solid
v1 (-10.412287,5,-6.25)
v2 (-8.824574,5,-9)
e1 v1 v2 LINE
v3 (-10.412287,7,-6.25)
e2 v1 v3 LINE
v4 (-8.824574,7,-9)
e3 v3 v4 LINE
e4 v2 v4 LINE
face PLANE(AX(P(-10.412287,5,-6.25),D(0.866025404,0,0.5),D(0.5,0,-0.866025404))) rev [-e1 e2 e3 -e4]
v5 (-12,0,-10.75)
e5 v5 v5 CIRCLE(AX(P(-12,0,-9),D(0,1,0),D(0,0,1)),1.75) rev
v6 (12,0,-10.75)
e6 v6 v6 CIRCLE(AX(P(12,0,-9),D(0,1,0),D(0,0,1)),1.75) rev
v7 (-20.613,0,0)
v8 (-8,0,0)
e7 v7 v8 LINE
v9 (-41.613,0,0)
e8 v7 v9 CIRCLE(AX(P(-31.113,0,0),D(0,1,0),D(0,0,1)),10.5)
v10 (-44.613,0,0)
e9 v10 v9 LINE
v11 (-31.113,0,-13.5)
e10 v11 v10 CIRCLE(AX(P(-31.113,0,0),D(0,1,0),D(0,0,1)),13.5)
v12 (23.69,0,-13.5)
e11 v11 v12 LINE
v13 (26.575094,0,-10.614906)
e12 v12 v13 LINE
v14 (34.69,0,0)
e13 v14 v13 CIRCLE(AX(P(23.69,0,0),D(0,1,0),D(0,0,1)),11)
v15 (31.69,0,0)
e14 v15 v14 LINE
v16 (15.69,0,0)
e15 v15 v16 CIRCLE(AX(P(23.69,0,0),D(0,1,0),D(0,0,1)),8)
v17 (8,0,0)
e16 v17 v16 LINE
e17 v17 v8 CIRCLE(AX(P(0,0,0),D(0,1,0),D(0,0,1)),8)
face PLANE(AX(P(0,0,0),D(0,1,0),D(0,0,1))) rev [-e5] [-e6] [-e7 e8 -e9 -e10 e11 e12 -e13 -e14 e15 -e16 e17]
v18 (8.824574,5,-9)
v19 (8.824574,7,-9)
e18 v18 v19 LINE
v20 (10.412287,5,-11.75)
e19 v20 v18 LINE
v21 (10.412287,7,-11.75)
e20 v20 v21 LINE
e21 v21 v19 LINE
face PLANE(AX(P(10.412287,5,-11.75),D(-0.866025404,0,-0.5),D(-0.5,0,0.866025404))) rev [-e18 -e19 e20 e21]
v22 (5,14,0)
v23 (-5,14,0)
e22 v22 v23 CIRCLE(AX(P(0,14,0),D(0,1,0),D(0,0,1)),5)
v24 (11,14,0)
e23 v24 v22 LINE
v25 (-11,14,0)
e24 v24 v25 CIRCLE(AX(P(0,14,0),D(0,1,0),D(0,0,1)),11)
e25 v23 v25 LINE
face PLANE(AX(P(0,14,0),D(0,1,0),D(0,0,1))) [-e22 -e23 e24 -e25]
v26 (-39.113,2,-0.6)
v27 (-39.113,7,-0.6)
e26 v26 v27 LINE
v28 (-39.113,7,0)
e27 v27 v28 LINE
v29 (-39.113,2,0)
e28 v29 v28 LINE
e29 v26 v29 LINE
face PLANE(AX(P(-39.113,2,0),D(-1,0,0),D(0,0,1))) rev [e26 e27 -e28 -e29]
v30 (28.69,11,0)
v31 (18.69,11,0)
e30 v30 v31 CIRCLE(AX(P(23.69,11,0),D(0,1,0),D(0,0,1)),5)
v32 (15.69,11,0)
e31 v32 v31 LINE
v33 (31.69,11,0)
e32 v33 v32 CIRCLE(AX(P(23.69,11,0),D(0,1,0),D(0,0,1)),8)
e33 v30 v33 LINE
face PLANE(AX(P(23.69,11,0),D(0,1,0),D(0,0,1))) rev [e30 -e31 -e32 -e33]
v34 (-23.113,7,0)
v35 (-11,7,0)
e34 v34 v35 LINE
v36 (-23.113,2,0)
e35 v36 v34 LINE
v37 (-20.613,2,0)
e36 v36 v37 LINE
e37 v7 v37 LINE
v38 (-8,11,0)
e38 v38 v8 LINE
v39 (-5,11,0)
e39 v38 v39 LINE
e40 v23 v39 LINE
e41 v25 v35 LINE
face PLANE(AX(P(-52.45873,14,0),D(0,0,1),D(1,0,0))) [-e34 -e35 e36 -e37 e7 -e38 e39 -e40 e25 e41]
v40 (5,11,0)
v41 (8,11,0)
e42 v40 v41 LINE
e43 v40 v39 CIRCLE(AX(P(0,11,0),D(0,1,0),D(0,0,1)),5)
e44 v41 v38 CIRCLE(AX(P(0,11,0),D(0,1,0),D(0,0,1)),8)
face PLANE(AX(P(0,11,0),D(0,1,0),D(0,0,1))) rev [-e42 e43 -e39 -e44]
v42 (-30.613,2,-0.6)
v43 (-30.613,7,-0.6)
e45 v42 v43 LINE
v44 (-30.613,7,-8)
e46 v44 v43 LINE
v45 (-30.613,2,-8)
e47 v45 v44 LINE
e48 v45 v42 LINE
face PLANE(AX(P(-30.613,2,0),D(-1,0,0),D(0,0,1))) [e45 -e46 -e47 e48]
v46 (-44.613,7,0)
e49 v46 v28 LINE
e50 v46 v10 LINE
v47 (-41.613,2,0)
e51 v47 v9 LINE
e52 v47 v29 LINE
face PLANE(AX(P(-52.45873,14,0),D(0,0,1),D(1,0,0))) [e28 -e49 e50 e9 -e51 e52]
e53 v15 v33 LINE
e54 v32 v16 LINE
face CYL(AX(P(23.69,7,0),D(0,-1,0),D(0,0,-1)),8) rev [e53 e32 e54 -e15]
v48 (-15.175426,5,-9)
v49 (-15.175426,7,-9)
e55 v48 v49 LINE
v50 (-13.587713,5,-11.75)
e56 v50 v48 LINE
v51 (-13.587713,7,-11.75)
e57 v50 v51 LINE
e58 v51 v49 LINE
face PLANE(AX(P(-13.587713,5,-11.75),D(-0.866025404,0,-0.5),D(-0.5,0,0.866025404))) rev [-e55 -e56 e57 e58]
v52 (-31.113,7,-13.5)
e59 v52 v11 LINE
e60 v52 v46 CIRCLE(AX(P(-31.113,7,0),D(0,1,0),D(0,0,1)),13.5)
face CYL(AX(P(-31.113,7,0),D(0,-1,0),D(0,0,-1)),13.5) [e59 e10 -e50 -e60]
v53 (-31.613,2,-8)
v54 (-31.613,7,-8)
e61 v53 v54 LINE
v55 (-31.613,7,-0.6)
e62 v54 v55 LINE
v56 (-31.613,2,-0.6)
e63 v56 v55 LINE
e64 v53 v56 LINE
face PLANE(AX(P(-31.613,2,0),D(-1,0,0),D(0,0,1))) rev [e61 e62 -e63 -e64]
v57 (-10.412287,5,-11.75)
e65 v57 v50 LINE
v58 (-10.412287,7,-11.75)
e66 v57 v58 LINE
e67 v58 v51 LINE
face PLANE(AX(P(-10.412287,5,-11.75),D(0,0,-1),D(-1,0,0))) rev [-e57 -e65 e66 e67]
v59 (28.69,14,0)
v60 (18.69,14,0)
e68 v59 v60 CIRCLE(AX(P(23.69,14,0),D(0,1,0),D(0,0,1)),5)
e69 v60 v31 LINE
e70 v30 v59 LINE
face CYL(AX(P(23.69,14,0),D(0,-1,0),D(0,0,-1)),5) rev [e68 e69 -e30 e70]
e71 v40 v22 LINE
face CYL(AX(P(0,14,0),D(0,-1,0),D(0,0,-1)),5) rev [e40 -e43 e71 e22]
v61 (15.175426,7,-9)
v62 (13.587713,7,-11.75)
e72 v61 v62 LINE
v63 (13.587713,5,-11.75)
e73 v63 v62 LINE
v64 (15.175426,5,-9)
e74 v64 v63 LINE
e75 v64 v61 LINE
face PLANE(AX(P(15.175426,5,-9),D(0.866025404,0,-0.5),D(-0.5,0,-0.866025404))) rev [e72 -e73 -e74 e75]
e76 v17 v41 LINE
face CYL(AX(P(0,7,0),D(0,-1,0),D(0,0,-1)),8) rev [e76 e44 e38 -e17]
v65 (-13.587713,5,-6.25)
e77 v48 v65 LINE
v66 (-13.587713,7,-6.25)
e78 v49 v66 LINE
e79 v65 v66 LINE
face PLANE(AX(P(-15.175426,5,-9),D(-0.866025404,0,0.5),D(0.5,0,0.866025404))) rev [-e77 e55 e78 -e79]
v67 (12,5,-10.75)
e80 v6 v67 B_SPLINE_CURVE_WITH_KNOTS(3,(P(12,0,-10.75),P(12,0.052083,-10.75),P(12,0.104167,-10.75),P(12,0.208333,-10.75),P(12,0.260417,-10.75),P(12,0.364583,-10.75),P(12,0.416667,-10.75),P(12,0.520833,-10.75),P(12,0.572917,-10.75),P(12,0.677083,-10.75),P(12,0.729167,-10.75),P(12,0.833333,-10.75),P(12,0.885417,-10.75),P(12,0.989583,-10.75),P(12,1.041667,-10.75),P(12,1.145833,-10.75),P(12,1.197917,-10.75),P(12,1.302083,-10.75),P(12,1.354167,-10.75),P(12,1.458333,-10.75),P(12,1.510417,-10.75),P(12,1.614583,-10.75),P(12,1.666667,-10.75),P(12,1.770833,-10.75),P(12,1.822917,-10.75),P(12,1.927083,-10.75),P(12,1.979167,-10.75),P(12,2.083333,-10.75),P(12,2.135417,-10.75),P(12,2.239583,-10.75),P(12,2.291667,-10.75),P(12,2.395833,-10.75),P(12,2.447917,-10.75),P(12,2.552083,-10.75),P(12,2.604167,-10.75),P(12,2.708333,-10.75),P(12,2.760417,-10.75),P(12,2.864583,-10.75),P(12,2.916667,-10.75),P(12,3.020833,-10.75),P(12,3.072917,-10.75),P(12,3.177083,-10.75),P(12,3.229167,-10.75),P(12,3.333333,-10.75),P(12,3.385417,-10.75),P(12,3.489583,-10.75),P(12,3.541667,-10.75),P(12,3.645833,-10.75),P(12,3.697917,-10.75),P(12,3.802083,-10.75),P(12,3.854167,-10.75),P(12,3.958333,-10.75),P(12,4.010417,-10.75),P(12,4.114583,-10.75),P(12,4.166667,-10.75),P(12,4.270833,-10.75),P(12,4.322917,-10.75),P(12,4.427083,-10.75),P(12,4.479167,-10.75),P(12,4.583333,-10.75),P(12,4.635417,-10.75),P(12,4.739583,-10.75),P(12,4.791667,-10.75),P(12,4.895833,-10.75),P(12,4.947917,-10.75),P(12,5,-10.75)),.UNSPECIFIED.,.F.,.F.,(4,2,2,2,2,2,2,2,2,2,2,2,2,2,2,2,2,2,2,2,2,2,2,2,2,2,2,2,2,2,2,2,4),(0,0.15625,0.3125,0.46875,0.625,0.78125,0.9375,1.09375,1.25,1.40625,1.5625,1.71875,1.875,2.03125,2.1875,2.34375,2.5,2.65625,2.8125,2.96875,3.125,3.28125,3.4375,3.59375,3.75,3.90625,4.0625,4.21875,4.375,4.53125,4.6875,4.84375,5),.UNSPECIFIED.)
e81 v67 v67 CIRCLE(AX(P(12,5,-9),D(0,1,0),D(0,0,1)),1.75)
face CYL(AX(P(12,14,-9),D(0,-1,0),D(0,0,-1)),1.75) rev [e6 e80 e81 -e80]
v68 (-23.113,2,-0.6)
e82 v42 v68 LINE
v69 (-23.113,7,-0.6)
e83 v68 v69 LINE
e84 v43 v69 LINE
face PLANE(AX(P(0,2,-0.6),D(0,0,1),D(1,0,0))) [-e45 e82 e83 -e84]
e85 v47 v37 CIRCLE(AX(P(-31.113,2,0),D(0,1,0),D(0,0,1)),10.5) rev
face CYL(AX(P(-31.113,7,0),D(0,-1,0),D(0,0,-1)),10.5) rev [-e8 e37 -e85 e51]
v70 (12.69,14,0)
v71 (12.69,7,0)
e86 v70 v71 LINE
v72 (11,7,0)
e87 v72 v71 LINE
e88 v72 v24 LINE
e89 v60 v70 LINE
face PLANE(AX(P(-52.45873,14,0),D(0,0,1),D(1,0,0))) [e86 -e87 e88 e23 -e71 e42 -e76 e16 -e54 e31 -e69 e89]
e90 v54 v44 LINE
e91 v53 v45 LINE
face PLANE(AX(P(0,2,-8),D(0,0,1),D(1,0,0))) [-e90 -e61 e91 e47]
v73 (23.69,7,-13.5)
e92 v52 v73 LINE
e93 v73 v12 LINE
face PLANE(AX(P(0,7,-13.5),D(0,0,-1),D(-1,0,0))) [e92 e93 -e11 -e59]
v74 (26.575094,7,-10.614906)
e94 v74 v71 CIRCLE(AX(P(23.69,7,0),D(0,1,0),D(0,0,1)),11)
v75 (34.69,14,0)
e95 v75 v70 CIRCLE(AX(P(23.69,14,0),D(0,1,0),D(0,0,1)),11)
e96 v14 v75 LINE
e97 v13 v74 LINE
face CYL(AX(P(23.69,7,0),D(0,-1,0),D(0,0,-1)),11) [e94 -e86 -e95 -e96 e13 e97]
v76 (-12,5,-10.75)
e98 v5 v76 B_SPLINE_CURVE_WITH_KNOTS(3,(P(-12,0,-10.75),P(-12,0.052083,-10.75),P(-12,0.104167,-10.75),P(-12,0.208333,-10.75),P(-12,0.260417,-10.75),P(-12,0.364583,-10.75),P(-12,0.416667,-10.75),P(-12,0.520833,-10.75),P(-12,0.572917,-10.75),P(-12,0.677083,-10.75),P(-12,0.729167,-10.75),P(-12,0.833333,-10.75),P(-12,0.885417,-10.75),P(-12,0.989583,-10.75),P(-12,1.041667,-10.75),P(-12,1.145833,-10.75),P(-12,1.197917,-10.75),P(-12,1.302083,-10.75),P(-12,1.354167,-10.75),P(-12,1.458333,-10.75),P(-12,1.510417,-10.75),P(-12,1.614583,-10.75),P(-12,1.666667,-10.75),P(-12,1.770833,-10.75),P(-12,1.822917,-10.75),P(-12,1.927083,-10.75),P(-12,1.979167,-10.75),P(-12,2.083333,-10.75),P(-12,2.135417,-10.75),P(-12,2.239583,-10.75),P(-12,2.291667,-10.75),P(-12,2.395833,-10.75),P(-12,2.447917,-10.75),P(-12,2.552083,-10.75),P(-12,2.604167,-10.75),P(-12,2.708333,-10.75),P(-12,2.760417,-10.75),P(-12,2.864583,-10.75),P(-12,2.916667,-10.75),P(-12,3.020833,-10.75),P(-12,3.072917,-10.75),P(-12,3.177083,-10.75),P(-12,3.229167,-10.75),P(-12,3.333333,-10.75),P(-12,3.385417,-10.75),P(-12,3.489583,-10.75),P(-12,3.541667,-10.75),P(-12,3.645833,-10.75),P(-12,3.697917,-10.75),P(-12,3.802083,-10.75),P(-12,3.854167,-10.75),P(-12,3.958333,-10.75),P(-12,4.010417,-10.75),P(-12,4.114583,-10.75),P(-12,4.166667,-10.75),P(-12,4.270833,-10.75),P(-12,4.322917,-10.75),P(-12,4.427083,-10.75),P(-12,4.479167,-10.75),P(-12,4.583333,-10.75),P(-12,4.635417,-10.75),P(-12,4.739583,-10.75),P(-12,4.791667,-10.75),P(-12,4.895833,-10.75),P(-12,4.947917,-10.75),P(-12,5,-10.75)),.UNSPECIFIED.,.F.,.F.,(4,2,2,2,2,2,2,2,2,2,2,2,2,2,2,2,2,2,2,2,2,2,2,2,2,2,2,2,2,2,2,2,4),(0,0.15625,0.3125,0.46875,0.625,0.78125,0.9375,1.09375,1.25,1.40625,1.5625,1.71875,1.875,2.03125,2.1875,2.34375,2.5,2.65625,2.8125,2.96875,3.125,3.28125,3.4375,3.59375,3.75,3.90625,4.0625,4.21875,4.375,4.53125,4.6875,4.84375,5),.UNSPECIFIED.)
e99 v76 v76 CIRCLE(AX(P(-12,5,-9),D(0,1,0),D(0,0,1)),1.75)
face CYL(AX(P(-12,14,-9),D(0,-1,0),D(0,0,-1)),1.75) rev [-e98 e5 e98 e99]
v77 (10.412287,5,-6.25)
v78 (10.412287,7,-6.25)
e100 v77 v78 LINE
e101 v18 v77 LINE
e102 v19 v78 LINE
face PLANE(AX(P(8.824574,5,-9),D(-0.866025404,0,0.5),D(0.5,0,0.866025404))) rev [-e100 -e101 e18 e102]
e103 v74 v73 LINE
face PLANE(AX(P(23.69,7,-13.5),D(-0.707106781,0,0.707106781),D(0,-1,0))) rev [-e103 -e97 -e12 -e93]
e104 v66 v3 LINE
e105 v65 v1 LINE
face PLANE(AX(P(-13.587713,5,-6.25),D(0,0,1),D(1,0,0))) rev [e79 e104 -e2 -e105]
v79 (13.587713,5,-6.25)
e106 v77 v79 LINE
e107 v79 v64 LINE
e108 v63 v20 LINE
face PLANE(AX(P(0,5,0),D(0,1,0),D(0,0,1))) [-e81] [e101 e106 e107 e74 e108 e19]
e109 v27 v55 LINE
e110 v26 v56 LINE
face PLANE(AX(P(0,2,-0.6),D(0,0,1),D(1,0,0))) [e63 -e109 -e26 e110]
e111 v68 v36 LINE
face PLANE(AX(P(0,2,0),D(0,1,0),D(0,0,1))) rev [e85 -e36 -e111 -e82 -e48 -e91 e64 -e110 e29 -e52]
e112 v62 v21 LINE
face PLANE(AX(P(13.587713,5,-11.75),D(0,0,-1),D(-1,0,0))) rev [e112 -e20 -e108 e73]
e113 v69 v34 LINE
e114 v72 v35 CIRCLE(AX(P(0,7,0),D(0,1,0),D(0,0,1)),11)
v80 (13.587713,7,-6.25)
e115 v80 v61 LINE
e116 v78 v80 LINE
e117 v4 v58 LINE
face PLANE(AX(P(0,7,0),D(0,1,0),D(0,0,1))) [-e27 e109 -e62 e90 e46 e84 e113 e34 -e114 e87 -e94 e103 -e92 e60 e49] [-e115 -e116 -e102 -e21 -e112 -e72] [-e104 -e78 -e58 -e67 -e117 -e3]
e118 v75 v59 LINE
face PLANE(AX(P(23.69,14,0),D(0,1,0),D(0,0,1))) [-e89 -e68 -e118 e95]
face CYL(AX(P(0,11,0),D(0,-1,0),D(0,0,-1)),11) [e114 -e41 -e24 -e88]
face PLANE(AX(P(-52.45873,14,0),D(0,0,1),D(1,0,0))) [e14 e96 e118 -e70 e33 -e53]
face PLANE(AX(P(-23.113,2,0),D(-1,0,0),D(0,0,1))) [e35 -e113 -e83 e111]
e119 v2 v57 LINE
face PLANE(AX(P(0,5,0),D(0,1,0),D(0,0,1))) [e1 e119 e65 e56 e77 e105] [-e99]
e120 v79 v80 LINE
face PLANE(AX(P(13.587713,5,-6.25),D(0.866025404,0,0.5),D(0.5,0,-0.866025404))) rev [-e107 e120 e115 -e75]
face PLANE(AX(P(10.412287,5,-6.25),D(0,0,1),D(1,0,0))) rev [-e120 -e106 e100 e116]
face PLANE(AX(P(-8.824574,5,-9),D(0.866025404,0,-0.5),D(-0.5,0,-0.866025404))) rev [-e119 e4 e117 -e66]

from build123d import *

# Parameters (mm, degrees)
SKETCH3_R               = 8
SKETCH3_R_2             = 5.000000000000001
BOSS_EXTRUDE1_DEPTH     = 7
CUT_EXTRUDE3_DEPTH      = 65.10592616131524
CUT_EXTRUDE3_DEPTH_BACK = 65.10592616131524
SKETCH4_R               = 1.7500000000000004
SKETCH4_R_2             = 1.7500000000000013
SKETCH6_R               = 10.999999999999993
SKETCH6_R_2             = 7.999999999999998
SKETCH6_R_3             = 11
SKETCH6_R_4             = 8
BOSS_EXTRUDE2_DEPTH     = 4
SKETCH7_R               = 10.999999999999993
SKETCH7_R_2             = 5.000000000000001
SKETCH7_R_3             = 11
SKETCH7_R_4             = 5
BOSS_EXTRUDE3_DEPTH     = 3
CHAMFER1_SIZE           = 2.5
CUT_EXTRUDE5_DEPTH      = 66.242392422412
CUT_EXTRUDE5_DEPTH_BACK = 66.242392422412
SKETCH9_R               = 1.7499999999999998
CUT_EXTRUDE6_START      = -2
SKETCH10_R              = 1.7499999999999998
CUT_EXTRUDE6_DEPTH      = 2
CHAMFER3_SIZE2          = 32
CHAMFER3_SIZE           = 22
CHAMFER4_SIZE           = 16
FILLET1_DEPTH           = 7
BOSS_EXTRUDE6_START     = 2
BOSS_EXTRUDE6_OUTLINE_R = 10.5
BOSS_EXTRUDE6_DEPTH     = 5
CUT_EXTRUDE7_DEPTH      = 66.24239242241201
CUT_EXTRUDE7_DEPTH_BACK = 66.24239242241201
SKETCH16_W              = 114.08603317988053
SKETCH16_H              = 61.14789556835377


with BuildPart() as part:
    # Sketch3 → Boss-Extrude1 (new body)
    # profile 1 of 10: a face of its own
    with BuildSketch(Plane(origin=(0, 0, 0), x_dir=(1, 0, 0), z_dir=(0, 1, 0))):
        with BuildLine():
            ThreePointArc((-17.613, 0), (-21.567058453981605, 9.545941546018392), (-31.113, 13.500000000000002))
            Line((-31.113, 13.5), (-31.113, 10.499999999999996))
            ThreePointArc((-31.11300000000032, 10.499999999999996), (-23.688378797541365, 7.424621202458859), (-20.613000000000003, 0))
            ThreePointArc((-20.613000000000003, -2.57e-15), (-23.688378797541368, -7.4246212024588605), (-31.11300000000031, -10.499999999999996))
            Line((-31.112999999999992, -10.499999999999996), (-31.112999999999992, -13.500000000000007))
            ThreePointArc((-31.11299999999999, -13.500000000000002), (-21.567058453981602, -9.545941546018385), (-17.613, -3.31e-15))
        make_face()
    # profile 2 of 10: a face of its own
    with BuildSketch(Plane(origin=(0, 0, 0), x_dir=(1, 0, 0), z_dir=(0, 1, 0))):
        with BuildLine():
            Line((-31.113, 10.499999999999996), (-31.113, 13.5))
            ThreePointArc((-31.113, 13.500000000000002), (-44.613, -4.34e-15), (-31.11299999999999, -13.500000000000002))
            Line((-31.112999999999992, -13.500000000000007), (-31.112999999999992, -10.499999999999996))
            ThreePointArc((-31.11300000000031, -10.499999999999996), (-41.613, -8.04e-15), (-31.11300000000032, 10.499999999999996))
        make_face()
    # profile 3 of 10: a face of its own
    with BuildSketch(Plane(origin=(0, 0, 0), x_dir=(1, 0, 0), z_dir=(0, 1, 0))):
        with BuildLine():
            Line((23.690000000000005, 13.500000000000002), (-31.113, 13.5))
            ThreePointArc((-31.113, 13.500000000000002), (-21.567058453981605, 9.545941546018392), (-17.613, 0))
            ThreePointArc((-17.613, -3.31e-15), (-21.567058453981602, -9.545941546018385), (-31.11299999999999, -13.500000000000002))
            Line((-31.112999999999992, -13.500000000000005), (23.690000000000005, -13.499999999999998))
            Line((23.690000000000005, -13.499999999999998), (23.690000000000005, -10.999999999999991))
            ThreePointArc((23.689999999999998, -10.999999999999993), (12.690000000000008, 1.112e-14), (23.690000000000015, 10.999999999999993))
            Line((23.690000000000005, 10.999999999999993), (23.690000000000005, 13.500000000000002))
        make_face()
        with Locations(Location((0, 0, 0), (0, 0, 270))):
            Circle(SKETCH3_R, mode=Mode.SUBTRACT)
    # profile 4 of 10: a face of its own
    with BuildSketch(Plane(origin=(0, 0, 0), x_dir=(1, 0, 0), z_dir=(0, 1, 0))):
        with BuildLine():
            ThreePointArc((-17.613, 0), (-21.567058453981605, 9.545941546018392), (-31.113, 13.500000000000002))
            Line((-31.113, 13.5), (-31.113, 10.499999999999996))
            ThreePointArc((-31.11300000000032, 10.499999999999996), (-23.688378797541365, 7.424621202458859), (-20.613000000000003, 0))
            ThreePointArc((-20.613000000000003, -2.57e-15), (-23.688378797541368, -7.4246212024588605), (-31.11300000000031, -10.499999999999996))
            Line((-31.112999999999992, -10.499999999999996), (-31.112999999999992, -13.500000000000007))
            ThreePointArc((-31.11299999999999, -13.500000000000002), (-21.567058453981602, -9.545941546018385), (-17.613, -3.31e-15))
        make_face()
    # profile 5 of 10: a face of its own
    with BuildSketch(Plane(origin=(0, 0, 0), x_dir=(1, 0, 0), z_dir=(0, 1, 0))):
        with BuildLine():
            Line((-31.113, 10.499999999999996), (-31.113, 13.5))
            ThreePointArc((-31.113, 13.500000000000002), (-44.613, -4.34e-15), (-31.11299999999999, -13.500000000000002))
            Line((-31.112999999999992, -13.500000000000007), (-31.112999999999992, -10.499999999999996))
            ThreePointArc((-31.11300000000031, -10.499999999999996), (-41.613, -8.04e-15), (-31.11300000000032, 10.499999999999996))
        make_face()
    # profile 6 of 10: a face of its own
    with BuildSketch(Plane(origin=(0, 0, 0), x_dir=(1, 0, 0), z_dir=(0, 1, 0))):
        with BuildLine():
            ThreePointArc((34.69, 0), (31.468174593052026, 7.778174593052012), (23.690000000000015, 10.999999999999993))
            Line((23.690000000000005, 10.999999999999993), (23.690000000000005, 7.999999999999998))
            ThreePointArc((23.689999999999863, 7.999999999999998), (29.34685424949233, 5.6568542494924285), (31.689999999999998, 0))
            ThreePointArc((31.689999999999998, -1.96e-15), (29.34685424949233, -5.65685424949243), (23.68999999999986, -7.999999999999998))
            Line((23.690000000000005, -7.999999999999998), (23.690000000000005, -10.999999999999991))
            ThreePointArc((23.689999999999998, -10.999999999999993), (31.468174593052016, -7.77817459305202), (34.69, -2.69e-15))
        make_face()
    # profile 7 of 10: a face of its own
    with BuildSketch(Plane(origin=(0, 0, 0), x_dir=(1, 0, 0), z_dir=(0, 1, 0))):
        with BuildLine():
            Line((23.690000000000005, 7.999999999999998), (23.690000000000005, 10.999999999999993))
            ThreePointArc((23.690000000000015, 10.999999999999993), (12.690000000000008, 1.112e-14), (23.689999999999998, -10.999999999999993))
            Line((23.690000000000005, -10.999999999999991), (23.690000000000005, -7.999999999999998))
            ThreePointArc((23.68999999999986, -7.999999999999998), (15.690000000000003, 9.8e-16), (23.689999999999863, 7.999999999999998))
        make_face()
    # profile 8 of 10: a face of its own
    with BuildSketch(Plane(origin=(0, 0, 0), x_dir=(1, 0, 0), z_dir=(0, 1, 0))):
        Polygon((-31.112999999999992, -13.500000000000005), (23.690000000000005, -13.499999999999998), (23.690000000000005, -45.5), (-31.11299999999999, -45.5), align=None)
        with Locations(Location((0, -32.70757493091458, 0), (0, 0, 270))):
            Circle(SKETCH3_R_2, mode=Mode.SUBTRACT)
    # profile 9 of 10: a face of its own
    with BuildSketch(Plane(origin=(0, 0, 0), x_dir=(1, 0, 0), z_dir=(0, 1, 0))):
        with BuildLine():
            ThreePointArc((34.69, 0), (31.468174593052026, 7.778174593052012), (23.690000000000015, 10.999999999999993))
            Line((23.690000000000005, 10.999999999999993), (23.690000000000005, 7.999999999999998))
            ThreePointArc((23.689999999999863, 7.999999999999998), (29.34685424949233, 5.6568542494924285), (31.689999999999998, 0))
            ThreePointArc((31.689999999999998, -1.96e-15), (29.34685424949233, -5.65685424949243), (23.68999999999986, -7.999999999999998))
            Line((23.690000000000005, -7.999999999999998), (23.690000000000005, -10.999999999999991))
            ThreePointArc((23.689999999999998, -10.999999999999993), (31.468174593052016, -7.77817459305202), (34.69, -2.69e-15))
        make_face()
    # profile 10 of 10: a face of its own
    with BuildSketch(Plane(origin=(0, 0, 0), x_dir=(1, 0, 0), z_dir=(0, 1, 0))):
        with BuildLine():
            Line((23.690000000000005, 7.999999999999998), (23.690000000000005, 10.999999999999993))
            ThreePointArc((23.690000000000015, 10.999999999999993), (12.690000000000008, 1.112e-14), (23.689999999999998, -10.999999999999993))
            Line((23.690000000000005, -10.999999999999991), (23.690000000000005, -7.999999999999998))
            ThreePointArc((23.68999999999986, -7.999999999999998), (15.690000000000003, 9.8e-16), (23.689999999999863, 7.999999999999998))
        make_face()
    extrude(amount=BOSS_EXTRUDE1_DEPTH)

    # Sketch4 → Cut-Extrude3 (cut, two sides: drawn at the far end of the back side and taken through both)
    with BuildSketch(Plane(origin=(0, 0, 0), x_dir=(1, 0, 0), z_dir=(0, 1, 0)).offset(-CUT_EXTRUDE3_DEPTH_BACK)):
        with Locations(Location((5.5, -27.207574930914586, 0), (0, 0, 270))):
            Circle(SKETCH4_R)
        with Locations(Location((5.5, -38.20757493091458, 0), (0, 0, 270))):
            Circle(SKETCH4_R_2)
        with Locations(Location((-5.5, -38.20757493091458, 0), (0, 0, 270))):
            Circle(SKETCH4_R_2)
        with Locations(Location((-5.5, -27.207574930914586, 0), (0, 0, 270))):
            Circle(SKETCH4_R)
    extrude(amount=CUT_EXTRUDE3_DEPTH + CUT_EXTRUDE3_DEPTH_BACK, mode=Mode.SUBTRACT)

    # Sketch6 → Boss-Extrude2 (add)
    # profile 1 of 2: a face of its own
    with BuildSketch(Plane(origin=(0, 7, 0), x_dir=(1, 0, 0), z_dir=(0, 1, 0))):
        with Locations(Location((23.69, 0, 0), (0, 0, 270))):
            Circle(SKETCH6_R)
        with Locations(Location((23.69, 0, 0), (0, 0, 270))):
            Circle(SKETCH6_R_2, mode=Mode.SUBTRACT)
    # profile 2 of 2: a face of its own
    with BuildSketch(Plane(origin=(0, 7, 0), x_dir=(1, 0, 0), z_dir=(0, 1, 0))):
        with Locations(Location((0, 0, 0), (0, 0, 270))):
            Circle(SKETCH6_R_3)
        with Locations(Location((0, 0, 0), (0, 0, 270))):
            Circle(SKETCH6_R_4, mode=Mode.SUBTRACT)
    extrude(amount=BOSS_EXTRUDE2_DEPTH)

    # Sketch7 → Boss-Extrude3 (add)
    # profile 1 of 2: a face of its own
    with BuildSketch(Plane(origin=(0, 11, 0), x_dir=(1, 0, 0), z_dir=(0, 1, 0))):
        with Locations(Location((23.69, 0, 0), (0, 0, 270))):
            Circle(SKETCH7_R)
        with Locations(Location((23.69, 0, 0), (0, 0, 270))):
            Circle(SKETCH7_R_2, mode=Mode.SUBTRACT)
    # profile 2 of 2: a face of its own
    with BuildSketch(Plane(origin=(0, 11, 0), x_dir=(1, 0, 0), z_dir=(0, 1, 0))):
        with Locations(Location((0, 0, 0), (0, 0, 270))):
            Circle(SKETCH7_R_3)
        with Locations(Location((0, 0, 0), (0, 0, 270))):
            Circle(SKETCH7_R_4, mode=Mode.SUBTRACT)
    extrude(amount=BOSS_EXTRUDE3_DEPTH)

    # Chamfer1
    # the kernel refuses this chamfer: 2.5 mm, written as the material it adds along each edge
    with BuildSketch(Plane(origin=(23.690000000000012, 0, -10.999999999999993), x_dir=(0.9912092295509807, 0, 0.13230367815352426), z_dir=(0, 1, 0))) as chamfer1_piece_1_section:
        with BuildLine():
            Line((2.910680919377515, 1e-17), (-CHAMFER1_SIZE * 0.132303678154, CHAMFER1_SIZE * 0.991209229551))
            Line((-CHAMFER1_SIZE * 0.132303678154, CHAMFER1_SIZE * 0.991209229551), (0, 0))
            ThreePointArc((0, 0), (1.4955265802521478, 0.09662506904492212), (2.910680919377515, 1e-17))
        make_face()
    chamfer1_piece_1 = extrude(amount=7, mode=Mode.PRIVATE)
    chamfer1_piece_1 = split(chamfer1_piece_1, bisect_by=Plane(origin=(23.690000000000012, 0, -13.500000000000002), z_dir=(3e-17, 0, 1)), keep=Keep.TOP, mode=Mode.PRIVATE)
    add(chamfer1_piece_1)

    # Sketch9 → Cut-Extrude5 (cut, two sides: drawn at the far end of the back side and taken through both)
    with BuildSketch(Plane(origin=(0, 0, 0), x_dir=(1, 0, 0), z_dir=(0, 1, 0)).offset(-CUT_EXTRUDE5_DEPTH_BACK)):
        with Locations(Location((12, 9, 0), (0, 0, 90))):
            Circle(SKETCH9_R)
        with Locations(Location((12, -9, 0), (0, 0, 90))):
            Circle(SKETCH9_R)
        with Locations(Location((-12, -9, 0), (0, 0, 90))):
            Circle(SKETCH9_R)
        with Locations(Location((-12, 9, 0), (0, 0, 90))):
            Circle(SKETCH9_R)
    extrude(amount=CUT_EXTRUDE5_DEPTH + CUT_EXTRUDE5_DEPTH_BACK, mode=Mode.SUBTRACT)

    # Sketch10 → Cut-Extrude6 (cut)
    # profile 1 of 4: a face of its own
    with BuildSketch(Plane(origin=(0, 7, 0), x_dir=(1, 0, 0), z_dir=(0, 1, 0)).offset(CUT_EXTRUDE6_START)):
        Polygon((-15.17542648054294, -9.000000000000002), (-13.587713240271471, -11.749999999999998), (-10.412286759728527, -11.749999999999998), (-8.824573519457056, -8.999999999999998), (-10.412286759728529, -6.249999999999998), (-13.58771324027147, -6.249999999999998), align=None)
        with Locations(Location((-12, -9, 0), (0, 0, 90))):
            Circle(SKETCH10_R, mode=Mode.SUBTRACT)
    # profile 2 of 4: a face of its own
    with BuildSketch(Plane(origin=(0, 7, 0), x_dir=(1, 0, 0), z_dir=(0, 1, 0)).offset(CUT_EXTRUDE6_START)):
        Polygon((-15.17542648054294, 8.999999999999998), (-13.587713240271473, 6.249999999999999), (-10.41228675972853, 6.249999999999999), (-8.824573519457058, 9), (-10.412286759728529, 11.75), (-13.587713240271468, 11.75), align=None)
        with Locations(Location((-12, 9, 0), (0, 0, 90))):
            Circle(SKETCH10_R, mode=Mode.SUBTRACT)
    # profile 3 of 4: a face of its own
    with BuildSketch(Plane(origin=(0, 7, 0), x_dir=(1, 0, 0), z_dir=(0, 1, 0)).offset(CUT_EXTRUDE6_START)):
        Polygon((15.175426480542939, 8.999999999999998), (13.587713240271471, 11.749999999999996), (10.412286759728532, 11.749999999999996), (8.82457351945706, 8.999999999999995), (10.412286759728527, 6.249999999999997), (13.58771324027147, 6.249999999999997), align=None)
        with Locations(Location((12, 9, 0), (0, 0, 90))):
            Circle(SKETCH10_R, mode=Mode.SUBTRACT)
    # profile 4 of 4: a face of its own
    with BuildSketch(Plane(origin=(0, 7, 0), x_dir=(1, 0, 0), z_dir=(0, 1, 0)).offset(CUT_EXTRUDE6_START)):
        Polygon((15.17542648054294, -9.000000000000002), (13.58771324027147, -6.249999999999999), (10.41228675972853, -6.249999999999999), (8.824573519457058, -9.000000000000002), (10.41228675972853, -11.75), (13.587713240271471, -11.75), align=None)
        with Locations(Location((12, -9, 0), (0, 0, 90))):
            Circle(SKETCH10_R, mode=Mode.SUBTRACT)
    extrude(amount=CUT_EXTRUDE6_DEPTH, mode=Mode.SUBTRACT)

    # Chamfer2
    # the kernel refuses this chamfer: 5 mm, written as the material it adds along each edge
    with BuildSketch(Plane(origin=(23.69, 0, 10.999999999999993), x_dir=(0.9874000606639179, 0, -0.15824386307497393), z_dir=(0, 1, 0))) as chamfer2_piece_1:
        with BuildLine():
            Line((3.622786343886572, 0.1414213562374673), (-0.8058373565311953, -4.287202344190177))
            Line((-0.8058373565311953, -4.287202344190177), (-0.9045773625975885, -4.27137795788268))
            ThreePointArc((-0.9045773625975885, -4.27137795788268), (-0.4437672242597131, -2.1370546546533555), (-0.0987400060663932, 0.01582438630749762))
            Line((-0.0987400060663932, 0.01582438630749762), (0.01582438630749734, 0.09874000606639144))
            ThreePointArc((0.01582438630749734, 0.09874000606639144), (1.8121079396960726, -0.03836531209673867), (3.6069619575790735, 0.24016136230385873))
            Line((3.6069619575790735, 0.24016136230385873), (3.622786343886572, 0.1414213562374673))
        make_face()
    extrude(amount=7)

    # Chamfer3
    chamfer3_edges = [part.edges().sort_by_distance(p)[0] for p in [
        (-31.11299999999999, 3.5, 45.5),
    ]]
    chamfer3_side = [part.faces().sort_by_distance(p)[0] for p in [
        (-30.672999999999988, 3.5, 45.5),
    ]]
    chamfer(chamfer3_edges, length=CHAMFER3_SIZE - 0.0001, length2=CHAMFER3_SIZE2 - 0.0001, reference=chamfer3_side[0])  # a hair under: the kernel refuses the full size

    # Chamfer4
    chamfer4_edges = [part.edges().sort_by_distance(p)[0] for p in [
        (23.690000000000005, 3.5, 45.5),
    ]]
    chamfer(chamfer4_edges, length=CHAMFER4_SIZE)

    # Fillet1: read off the stored shape, not the designer's step
    # Fillet1 outline → Fillet1 (add)
    with BuildSketch(Plane(origin=(0, 0, 0), x_dir=(1, 0, 0), z_dir=(0, 1, 0))):
        with BuildLine():
            ThreePointArc((-31.113, -13.5), (-32.547033058, -13.423619079), (-33.96483904, -13.19534062))
            ThreePointArc((-33.96483904, -13.19534062), (-31.199410591, -14.370304214), (-29.062482337, -16.482571146))
            Line((-29.062482337, -16.482571146), (-31.113, -13.5))
        make_face()
    extrude(amount=FILLET1_DEPTH)

    # Boss-Extrude6: read off the stored shape, not the designer's step
    # Boss-Extrude6 outline → Boss-Extrude6 (add)
    with BuildSketch(Plane(origin=(0, 0, 0), x_dir=(1, 0, 0), z_dir=(0, 1, 0)).offset(BOSS_EXTRUDE6_START)):
        with Locations((-31.113, 0)):
            Circle(BOSS_EXTRUDE6_OUTLINE_R)
        Polygon((-30.613, 8), (-30.613, 0.6), (-23.113, 0.6), (-23.113, -0.6), (-30.613, -0.6), (-30.613, -8), (-31.613, -8), (-31.613, -0.6), (-39.113, -0.6), (-39.113, 0.6), (-31.613, 0.6), (-31.613, 8), align=None, mode=Mode.SUBTRACT)
    extrude(amount=BOSS_EXTRUDE6_DEPTH)

    # Sketch16 → Cut-Extrude7 (cut, two sides: drawn at the far end of the back side and taken through both)
    with BuildSketch(Plane(origin=(0, 0, 0), x_dir=(1, 0, 0), z_dir=(0, 1, 0)).offset(-CUT_EXTRUDE7_DEPTH_BACK)):
        with Locations((4.584286452118391, -30.573947784176884)):
            Rectangle(SKETCH16_W, SKETCH16_H)
    extrude(amount=CUT_EXTRUDE7_DEPTH + CUT_EXTRUDE7_DEPTH_BACK, mode=Mode.SUBTRACT)


solid = part.part
